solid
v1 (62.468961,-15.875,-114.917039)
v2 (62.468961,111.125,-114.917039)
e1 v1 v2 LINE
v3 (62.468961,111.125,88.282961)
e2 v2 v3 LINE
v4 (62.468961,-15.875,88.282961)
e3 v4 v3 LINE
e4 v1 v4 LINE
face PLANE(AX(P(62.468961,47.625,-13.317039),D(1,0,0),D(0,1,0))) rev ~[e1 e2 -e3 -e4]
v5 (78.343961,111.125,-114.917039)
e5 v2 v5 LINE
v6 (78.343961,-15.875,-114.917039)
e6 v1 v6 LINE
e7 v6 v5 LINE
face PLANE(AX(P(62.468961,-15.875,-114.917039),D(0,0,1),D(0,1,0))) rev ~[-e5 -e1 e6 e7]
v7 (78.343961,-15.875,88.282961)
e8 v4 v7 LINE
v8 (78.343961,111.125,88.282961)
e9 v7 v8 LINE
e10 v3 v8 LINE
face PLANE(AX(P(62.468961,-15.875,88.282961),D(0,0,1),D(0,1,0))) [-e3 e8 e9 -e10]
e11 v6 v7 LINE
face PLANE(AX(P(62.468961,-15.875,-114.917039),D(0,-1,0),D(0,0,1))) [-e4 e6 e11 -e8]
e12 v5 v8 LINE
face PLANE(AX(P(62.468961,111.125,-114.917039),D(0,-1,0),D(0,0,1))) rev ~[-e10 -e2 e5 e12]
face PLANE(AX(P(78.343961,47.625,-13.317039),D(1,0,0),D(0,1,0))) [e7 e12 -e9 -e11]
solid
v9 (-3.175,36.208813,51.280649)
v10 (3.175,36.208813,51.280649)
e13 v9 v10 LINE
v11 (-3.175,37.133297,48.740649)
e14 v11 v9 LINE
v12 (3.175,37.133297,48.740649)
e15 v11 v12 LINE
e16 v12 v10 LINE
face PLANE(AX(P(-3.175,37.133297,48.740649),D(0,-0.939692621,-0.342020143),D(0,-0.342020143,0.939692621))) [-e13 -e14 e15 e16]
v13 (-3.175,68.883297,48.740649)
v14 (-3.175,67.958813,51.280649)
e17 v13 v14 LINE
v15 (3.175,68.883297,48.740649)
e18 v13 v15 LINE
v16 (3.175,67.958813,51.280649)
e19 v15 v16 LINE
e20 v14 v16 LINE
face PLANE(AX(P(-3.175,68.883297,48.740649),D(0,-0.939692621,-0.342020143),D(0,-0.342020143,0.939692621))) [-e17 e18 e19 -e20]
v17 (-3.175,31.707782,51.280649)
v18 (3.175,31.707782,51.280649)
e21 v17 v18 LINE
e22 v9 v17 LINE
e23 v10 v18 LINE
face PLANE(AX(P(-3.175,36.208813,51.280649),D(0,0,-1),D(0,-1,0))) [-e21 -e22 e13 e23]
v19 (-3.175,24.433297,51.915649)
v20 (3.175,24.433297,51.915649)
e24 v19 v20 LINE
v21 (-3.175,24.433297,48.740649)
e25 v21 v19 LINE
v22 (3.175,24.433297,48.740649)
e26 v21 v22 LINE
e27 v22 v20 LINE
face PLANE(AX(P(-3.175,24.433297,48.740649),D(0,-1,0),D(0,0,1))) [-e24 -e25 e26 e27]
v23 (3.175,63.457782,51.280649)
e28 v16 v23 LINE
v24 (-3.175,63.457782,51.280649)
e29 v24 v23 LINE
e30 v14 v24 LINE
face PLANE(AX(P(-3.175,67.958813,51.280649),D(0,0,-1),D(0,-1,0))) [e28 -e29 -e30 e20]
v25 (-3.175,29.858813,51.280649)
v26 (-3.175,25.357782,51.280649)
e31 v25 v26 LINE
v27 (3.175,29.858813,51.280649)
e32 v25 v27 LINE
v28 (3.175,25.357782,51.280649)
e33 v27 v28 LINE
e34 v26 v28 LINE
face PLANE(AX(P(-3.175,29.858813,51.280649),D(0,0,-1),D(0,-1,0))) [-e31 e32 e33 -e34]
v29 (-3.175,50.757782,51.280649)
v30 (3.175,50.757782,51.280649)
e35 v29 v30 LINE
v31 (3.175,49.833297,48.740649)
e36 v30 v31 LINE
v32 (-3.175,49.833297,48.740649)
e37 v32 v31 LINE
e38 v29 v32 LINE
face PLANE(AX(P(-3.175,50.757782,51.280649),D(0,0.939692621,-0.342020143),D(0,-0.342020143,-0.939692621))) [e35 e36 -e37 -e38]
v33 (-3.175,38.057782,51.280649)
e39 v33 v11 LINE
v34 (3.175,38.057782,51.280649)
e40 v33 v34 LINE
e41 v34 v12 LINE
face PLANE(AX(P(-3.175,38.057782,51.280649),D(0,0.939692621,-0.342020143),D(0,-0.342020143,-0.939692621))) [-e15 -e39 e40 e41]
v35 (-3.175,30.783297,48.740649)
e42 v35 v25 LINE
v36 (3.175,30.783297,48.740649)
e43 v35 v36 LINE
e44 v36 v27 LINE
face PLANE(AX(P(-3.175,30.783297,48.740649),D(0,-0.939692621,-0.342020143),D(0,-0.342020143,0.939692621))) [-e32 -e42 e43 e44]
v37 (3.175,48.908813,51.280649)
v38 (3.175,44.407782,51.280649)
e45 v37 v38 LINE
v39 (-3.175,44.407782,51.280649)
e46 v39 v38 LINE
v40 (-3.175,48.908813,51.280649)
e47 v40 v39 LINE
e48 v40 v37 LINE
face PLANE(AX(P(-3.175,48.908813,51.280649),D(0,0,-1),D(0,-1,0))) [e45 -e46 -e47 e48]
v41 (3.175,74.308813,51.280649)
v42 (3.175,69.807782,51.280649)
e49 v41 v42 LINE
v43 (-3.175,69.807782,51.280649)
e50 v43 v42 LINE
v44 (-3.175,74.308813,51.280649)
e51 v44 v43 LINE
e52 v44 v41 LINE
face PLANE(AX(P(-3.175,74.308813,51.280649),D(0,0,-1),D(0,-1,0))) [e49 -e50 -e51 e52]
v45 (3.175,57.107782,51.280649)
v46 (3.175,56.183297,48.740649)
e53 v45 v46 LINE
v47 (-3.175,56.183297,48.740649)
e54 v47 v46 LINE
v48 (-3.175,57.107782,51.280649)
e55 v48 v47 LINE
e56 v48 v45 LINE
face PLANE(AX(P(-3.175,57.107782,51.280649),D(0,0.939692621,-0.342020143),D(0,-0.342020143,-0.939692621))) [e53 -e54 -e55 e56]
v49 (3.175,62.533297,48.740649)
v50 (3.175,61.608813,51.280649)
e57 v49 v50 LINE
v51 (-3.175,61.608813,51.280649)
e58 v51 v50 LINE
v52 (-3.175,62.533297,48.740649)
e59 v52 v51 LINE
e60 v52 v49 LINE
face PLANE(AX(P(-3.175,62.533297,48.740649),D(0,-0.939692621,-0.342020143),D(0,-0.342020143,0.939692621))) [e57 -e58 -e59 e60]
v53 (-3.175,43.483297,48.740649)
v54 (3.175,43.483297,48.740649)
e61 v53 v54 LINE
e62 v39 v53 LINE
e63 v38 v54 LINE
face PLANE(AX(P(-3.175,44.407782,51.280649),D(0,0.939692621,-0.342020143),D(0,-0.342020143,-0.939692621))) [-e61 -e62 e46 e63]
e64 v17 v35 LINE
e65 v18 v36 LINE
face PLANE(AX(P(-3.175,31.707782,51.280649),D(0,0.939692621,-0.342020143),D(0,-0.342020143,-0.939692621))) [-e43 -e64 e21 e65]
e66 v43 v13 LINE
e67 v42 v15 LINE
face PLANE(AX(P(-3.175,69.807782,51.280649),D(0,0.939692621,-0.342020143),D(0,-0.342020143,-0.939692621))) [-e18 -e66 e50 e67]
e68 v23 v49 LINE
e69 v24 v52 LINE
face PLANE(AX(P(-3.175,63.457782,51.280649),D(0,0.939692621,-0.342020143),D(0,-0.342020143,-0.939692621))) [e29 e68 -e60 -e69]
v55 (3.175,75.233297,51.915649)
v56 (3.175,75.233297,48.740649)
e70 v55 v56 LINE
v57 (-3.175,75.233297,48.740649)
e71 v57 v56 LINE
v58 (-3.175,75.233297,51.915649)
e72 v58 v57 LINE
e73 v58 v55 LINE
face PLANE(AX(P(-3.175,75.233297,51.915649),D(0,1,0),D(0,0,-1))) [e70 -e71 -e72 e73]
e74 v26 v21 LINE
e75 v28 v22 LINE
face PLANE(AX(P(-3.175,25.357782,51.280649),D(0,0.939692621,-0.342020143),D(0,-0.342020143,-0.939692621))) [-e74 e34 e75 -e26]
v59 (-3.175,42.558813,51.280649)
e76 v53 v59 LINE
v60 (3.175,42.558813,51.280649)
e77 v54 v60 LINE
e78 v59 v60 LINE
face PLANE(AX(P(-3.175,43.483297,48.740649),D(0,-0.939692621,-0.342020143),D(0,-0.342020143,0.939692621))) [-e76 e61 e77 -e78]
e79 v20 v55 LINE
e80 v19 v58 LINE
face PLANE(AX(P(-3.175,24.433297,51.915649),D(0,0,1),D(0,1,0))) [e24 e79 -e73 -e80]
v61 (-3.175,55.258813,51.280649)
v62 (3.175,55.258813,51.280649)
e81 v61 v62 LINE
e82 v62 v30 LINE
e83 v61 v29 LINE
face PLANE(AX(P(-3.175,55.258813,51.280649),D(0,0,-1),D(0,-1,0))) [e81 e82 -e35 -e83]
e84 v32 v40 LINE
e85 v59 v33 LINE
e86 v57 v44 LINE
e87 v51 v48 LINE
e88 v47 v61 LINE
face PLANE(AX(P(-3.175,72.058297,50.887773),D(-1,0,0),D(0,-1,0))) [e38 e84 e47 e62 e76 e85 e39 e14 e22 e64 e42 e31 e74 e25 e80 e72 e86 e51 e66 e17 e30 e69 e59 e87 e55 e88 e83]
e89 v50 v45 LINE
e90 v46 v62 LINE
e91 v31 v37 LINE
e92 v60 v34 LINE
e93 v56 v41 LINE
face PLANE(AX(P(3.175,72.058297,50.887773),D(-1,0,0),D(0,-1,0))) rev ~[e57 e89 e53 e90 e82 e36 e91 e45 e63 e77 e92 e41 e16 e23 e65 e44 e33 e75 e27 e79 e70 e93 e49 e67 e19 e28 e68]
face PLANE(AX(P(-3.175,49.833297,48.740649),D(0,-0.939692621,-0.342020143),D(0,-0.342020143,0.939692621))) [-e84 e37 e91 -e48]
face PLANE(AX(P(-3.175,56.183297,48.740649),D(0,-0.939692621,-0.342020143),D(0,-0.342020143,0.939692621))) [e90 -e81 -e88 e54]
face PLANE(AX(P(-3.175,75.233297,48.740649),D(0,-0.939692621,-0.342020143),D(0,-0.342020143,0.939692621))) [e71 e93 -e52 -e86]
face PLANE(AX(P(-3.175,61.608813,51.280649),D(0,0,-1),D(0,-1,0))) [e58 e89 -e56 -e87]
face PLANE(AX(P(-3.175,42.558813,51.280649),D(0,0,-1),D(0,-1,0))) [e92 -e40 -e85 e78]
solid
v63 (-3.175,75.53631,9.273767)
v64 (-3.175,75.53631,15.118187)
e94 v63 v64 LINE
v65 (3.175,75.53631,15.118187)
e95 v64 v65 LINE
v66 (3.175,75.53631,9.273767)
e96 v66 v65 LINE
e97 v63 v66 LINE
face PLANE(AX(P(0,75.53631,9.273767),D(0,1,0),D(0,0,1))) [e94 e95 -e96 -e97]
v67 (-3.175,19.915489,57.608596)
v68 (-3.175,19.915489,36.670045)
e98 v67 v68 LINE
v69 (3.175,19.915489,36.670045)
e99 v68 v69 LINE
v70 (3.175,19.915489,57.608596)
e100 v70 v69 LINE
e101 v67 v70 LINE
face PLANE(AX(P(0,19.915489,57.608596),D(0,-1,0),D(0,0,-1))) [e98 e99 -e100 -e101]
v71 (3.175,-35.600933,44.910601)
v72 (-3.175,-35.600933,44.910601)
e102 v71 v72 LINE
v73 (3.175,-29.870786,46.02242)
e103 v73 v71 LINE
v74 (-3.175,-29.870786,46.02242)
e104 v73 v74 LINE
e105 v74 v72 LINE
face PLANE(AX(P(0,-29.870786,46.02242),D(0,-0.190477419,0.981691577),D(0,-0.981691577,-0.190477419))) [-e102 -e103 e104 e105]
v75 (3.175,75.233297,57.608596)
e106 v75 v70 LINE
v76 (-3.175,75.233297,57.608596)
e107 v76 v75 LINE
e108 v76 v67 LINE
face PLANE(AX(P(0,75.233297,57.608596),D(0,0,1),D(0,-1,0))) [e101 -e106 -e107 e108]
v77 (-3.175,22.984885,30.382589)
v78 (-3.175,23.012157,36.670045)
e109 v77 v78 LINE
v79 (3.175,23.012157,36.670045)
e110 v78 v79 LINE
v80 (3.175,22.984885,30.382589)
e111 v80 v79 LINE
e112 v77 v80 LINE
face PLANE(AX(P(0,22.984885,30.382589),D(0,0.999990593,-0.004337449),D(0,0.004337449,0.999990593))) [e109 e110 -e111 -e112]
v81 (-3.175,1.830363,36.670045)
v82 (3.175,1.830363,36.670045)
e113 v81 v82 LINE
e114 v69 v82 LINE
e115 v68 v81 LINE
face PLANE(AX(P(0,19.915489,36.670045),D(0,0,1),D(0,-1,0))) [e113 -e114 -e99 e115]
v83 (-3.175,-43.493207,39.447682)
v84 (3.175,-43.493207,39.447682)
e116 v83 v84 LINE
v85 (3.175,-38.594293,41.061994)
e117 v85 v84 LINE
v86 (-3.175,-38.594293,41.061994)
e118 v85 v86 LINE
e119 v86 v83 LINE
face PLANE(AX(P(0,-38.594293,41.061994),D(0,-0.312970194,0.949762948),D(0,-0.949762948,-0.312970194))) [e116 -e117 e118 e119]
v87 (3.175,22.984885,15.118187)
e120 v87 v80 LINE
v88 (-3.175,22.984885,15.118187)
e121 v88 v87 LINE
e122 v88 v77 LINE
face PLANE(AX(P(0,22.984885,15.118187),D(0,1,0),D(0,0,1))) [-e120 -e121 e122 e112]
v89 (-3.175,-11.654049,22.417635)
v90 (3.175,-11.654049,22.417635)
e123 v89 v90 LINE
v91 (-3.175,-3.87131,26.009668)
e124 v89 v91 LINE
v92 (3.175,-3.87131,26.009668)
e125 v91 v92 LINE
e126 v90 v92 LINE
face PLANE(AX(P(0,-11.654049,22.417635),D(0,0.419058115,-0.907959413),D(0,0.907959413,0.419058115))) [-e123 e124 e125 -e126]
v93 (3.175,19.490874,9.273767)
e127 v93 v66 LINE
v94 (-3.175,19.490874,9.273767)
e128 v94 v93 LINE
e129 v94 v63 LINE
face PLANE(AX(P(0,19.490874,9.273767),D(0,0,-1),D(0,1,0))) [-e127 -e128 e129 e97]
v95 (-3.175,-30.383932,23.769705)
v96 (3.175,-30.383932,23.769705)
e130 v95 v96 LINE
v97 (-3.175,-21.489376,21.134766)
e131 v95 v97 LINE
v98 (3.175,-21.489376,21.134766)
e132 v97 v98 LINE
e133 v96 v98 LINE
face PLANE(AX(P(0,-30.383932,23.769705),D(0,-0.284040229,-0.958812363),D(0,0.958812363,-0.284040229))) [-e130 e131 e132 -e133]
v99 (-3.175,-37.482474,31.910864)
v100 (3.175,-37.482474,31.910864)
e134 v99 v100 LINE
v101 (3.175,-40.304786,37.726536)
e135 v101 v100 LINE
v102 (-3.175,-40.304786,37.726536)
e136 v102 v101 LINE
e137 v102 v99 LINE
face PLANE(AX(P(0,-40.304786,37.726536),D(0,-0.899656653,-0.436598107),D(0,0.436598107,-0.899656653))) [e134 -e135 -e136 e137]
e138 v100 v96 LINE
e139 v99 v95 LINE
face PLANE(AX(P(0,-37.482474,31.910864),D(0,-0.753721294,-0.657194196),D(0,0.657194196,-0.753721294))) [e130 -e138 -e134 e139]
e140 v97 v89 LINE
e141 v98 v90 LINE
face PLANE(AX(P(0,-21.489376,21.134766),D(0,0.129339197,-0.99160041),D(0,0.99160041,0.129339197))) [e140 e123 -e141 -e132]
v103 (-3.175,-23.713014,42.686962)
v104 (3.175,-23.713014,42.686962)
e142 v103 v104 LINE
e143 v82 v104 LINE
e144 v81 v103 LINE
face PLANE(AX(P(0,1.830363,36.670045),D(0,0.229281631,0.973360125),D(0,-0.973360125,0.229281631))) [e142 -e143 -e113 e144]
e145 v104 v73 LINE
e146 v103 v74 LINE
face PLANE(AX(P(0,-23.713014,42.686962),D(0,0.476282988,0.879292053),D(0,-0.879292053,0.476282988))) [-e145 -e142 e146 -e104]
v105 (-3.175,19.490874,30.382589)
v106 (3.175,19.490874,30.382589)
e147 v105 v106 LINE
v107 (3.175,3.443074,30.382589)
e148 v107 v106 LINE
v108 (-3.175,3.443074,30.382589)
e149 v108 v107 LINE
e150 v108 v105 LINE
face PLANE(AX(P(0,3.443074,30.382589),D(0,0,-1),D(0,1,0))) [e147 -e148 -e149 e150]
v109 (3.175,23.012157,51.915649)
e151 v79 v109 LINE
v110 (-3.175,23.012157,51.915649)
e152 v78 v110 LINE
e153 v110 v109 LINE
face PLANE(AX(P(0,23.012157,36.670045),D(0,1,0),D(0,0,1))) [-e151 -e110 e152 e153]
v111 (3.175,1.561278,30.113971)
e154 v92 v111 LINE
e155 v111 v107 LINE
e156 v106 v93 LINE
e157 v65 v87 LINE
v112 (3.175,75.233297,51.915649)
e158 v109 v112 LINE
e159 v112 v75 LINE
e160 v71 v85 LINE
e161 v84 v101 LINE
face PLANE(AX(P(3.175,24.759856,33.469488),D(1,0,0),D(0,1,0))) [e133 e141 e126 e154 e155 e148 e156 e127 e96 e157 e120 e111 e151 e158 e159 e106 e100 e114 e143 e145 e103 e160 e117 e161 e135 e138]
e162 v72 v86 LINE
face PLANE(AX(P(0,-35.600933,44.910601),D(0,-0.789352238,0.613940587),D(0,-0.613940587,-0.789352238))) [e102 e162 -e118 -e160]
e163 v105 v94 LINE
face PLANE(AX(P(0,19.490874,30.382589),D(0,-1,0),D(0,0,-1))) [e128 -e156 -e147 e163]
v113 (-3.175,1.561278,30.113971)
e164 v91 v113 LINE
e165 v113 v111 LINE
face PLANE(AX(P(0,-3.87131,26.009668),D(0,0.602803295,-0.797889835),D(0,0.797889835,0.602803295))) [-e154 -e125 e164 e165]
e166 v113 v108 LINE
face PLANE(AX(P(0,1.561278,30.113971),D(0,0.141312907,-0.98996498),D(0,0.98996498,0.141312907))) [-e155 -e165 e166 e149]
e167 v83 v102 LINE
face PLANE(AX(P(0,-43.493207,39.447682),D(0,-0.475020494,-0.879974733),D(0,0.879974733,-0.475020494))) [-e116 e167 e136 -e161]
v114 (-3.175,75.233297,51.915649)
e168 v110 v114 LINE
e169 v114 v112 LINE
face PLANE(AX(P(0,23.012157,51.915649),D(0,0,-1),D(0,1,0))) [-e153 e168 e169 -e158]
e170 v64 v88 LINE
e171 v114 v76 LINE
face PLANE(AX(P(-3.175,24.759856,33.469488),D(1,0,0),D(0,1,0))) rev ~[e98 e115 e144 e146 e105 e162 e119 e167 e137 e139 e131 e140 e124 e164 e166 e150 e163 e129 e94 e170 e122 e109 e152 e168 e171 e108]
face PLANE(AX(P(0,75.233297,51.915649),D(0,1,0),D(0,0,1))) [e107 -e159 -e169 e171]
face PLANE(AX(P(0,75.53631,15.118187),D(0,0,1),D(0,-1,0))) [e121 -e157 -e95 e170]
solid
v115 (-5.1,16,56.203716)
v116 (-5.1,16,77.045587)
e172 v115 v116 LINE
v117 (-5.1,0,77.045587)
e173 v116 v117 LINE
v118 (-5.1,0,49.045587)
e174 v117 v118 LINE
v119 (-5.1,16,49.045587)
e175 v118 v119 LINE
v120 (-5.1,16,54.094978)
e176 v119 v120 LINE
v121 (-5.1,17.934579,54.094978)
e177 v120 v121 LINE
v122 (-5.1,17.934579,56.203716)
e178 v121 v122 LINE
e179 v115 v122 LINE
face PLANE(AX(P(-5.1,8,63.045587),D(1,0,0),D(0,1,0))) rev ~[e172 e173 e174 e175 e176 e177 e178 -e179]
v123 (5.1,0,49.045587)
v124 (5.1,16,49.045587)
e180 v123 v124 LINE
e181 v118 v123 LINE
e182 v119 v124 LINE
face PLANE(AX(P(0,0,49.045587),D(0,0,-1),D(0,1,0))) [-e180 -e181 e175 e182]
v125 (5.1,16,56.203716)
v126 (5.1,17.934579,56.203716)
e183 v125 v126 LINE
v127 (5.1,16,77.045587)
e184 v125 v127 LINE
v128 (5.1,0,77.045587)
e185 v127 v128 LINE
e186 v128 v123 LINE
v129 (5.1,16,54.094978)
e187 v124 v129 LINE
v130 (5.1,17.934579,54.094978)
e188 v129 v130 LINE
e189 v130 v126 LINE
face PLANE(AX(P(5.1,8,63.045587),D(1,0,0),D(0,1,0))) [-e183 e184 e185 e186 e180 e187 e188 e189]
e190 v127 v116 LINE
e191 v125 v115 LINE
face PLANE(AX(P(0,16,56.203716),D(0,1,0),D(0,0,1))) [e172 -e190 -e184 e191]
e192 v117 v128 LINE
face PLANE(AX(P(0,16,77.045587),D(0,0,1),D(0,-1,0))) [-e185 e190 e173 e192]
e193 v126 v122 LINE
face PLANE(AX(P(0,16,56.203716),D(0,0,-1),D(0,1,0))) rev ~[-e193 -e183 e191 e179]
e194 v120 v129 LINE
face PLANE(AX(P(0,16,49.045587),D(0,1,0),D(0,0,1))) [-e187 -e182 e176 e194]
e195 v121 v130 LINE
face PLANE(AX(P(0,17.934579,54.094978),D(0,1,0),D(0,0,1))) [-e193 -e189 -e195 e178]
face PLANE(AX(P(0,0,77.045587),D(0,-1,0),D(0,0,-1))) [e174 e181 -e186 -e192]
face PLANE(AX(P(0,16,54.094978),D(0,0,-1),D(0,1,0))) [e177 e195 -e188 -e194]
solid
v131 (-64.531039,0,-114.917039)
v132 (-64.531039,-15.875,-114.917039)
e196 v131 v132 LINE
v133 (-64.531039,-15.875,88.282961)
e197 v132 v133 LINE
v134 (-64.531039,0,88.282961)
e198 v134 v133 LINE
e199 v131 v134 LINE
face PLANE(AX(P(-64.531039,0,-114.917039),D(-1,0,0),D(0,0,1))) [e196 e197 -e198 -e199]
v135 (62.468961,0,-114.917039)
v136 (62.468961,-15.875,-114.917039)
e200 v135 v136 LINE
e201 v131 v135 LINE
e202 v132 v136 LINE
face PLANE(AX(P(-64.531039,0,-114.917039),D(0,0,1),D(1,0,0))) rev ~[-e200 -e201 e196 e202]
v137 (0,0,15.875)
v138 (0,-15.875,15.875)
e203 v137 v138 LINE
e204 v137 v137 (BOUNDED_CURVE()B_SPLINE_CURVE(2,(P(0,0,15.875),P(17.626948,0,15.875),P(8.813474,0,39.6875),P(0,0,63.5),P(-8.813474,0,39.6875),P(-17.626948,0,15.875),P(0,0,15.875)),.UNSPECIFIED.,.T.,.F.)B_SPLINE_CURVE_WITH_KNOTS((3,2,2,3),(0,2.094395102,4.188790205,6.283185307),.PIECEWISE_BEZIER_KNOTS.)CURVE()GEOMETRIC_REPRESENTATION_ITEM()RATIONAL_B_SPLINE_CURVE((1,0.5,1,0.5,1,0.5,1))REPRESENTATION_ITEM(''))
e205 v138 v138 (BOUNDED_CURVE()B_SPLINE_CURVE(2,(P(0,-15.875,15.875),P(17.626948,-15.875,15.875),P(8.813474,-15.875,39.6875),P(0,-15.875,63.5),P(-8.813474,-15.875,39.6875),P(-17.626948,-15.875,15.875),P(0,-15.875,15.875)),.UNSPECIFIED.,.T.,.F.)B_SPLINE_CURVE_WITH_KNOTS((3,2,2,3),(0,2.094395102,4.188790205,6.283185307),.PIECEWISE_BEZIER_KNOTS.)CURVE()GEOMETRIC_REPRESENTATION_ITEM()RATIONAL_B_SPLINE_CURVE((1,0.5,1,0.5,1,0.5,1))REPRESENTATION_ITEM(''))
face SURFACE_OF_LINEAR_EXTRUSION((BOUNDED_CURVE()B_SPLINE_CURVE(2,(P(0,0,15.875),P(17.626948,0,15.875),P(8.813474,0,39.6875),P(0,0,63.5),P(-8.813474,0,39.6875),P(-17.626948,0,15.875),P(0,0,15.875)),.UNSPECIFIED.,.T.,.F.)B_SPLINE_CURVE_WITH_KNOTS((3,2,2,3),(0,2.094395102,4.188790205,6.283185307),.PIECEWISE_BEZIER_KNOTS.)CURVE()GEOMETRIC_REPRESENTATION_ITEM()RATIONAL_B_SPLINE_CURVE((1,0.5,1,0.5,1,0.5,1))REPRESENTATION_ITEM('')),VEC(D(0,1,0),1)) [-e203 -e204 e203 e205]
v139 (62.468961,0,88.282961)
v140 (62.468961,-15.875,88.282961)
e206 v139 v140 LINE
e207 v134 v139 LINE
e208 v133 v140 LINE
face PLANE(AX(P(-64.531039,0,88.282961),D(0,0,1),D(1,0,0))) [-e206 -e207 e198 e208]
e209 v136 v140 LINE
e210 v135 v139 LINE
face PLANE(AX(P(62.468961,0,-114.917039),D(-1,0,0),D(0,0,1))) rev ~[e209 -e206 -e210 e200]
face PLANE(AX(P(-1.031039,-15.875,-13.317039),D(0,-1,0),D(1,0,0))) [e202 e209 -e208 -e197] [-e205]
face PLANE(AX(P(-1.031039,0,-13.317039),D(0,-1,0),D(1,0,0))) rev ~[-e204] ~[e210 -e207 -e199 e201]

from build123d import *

# Parameters (mm, degrees)
F2_DEPTH      = 3.175
F2_DEPTH_BACK = 3.175
F3_W          = 127
F3_H          = 203.2
F4_DEPTH      = 15.875
F5_W          = 127
F5_H          = 203.2
F6_DEPTH      = 15.875
F7_W          = 1.9345794022
F7_H          = 2.1087378263
F8_DEPTH      = 5.1
F8_DEPTH_BACK = 5.1
F10_DEPTH     = 6.35


# Not quite as in the source:
# - a variable given as a bare number and used for a length is read in inches; the dataset says mm whatever the document's units were


with BuildPart() as f2:
    # F1 (on Right) → F2 (new body, two sides)
    with BuildSketch(Plane.YZ) as f2_sk:
        Polygon((-38.594293431, 41.0619944761), (-43.4932071195, 39.4476822198), (-40.3047855642, 37.7265355505), (-37.482474095, 31.9108637659), (-30.3839322929, 23.7697052669), (-21.4893757698, 21.1347664927), (-11.6540487569, 22.4176353632), (-3.8713104227, 26.0096677876), (1.5612775253, 30.1139711279), (3.4430737253, 30.3825888026), (19.4908740901, 30.3825888026), (19.4908740901, 9.2737668518), (75.5363102326, 9.2737668518), (75.5363102326, 15.1181869977), (22.9848847986, 15.1181869977), (22.9848847986, 30.3825888026), (23.0121565767, 36.6700449444), (23.0121565767, 51.9156488357), (75.233297396, 51.9156488357), (75.233297396, 57.6085964854), (19.9154892202, 57.6085964854), (19.9154892202, 36.6700449444), (1.8303633194, 36.6700449444), (-23.7130144418, 42.6869621861), (-29.8707857541, 46.0224201941), (-35.6009331156, 44.9106008581), align=None)
    extrude(amount=F2_DEPTH)
    extrude(f2_sk.sketch, amount=-F2_DEPTH_BACK)


with BuildPart() as f4:
    # F3 (on Front) → F4 (new body)
    with BuildSketch(Plane.XZ):
        with Locations((-1.0310392827, -13.3170386252)):
            Rectangle(F3_W, F3_H)
        with BuildLine():
            add(Edge.make_bspline(
                [(0, 15.875), (17.626948032, 15.875), (8.813474016, 39.6875), (0, 63.5), (-8.813474016, 39.6875), (-17.626948032, 15.875), (0, 15.875)],
                knots=[0, 0, 0, 2.0943951024, 2.0943951024, 4.1887902048, 4.1887902048, 6.2831853072, 6.2831853072, 6.2831853072], degree=2, weights=[1, 0.5, 1, 0.5, 1, 0.5, 1]))
        make_face(mode=Mode.SUBTRACT)
    extrude(amount=F4_DEPTH)


with BuildPart() as f6:
    # F5 (on face) → F6 (new body)
    with BuildSketch(Plane.YZ.offset(62.4689607173)):
        with Locations((47.625, -13.3170386252)):
            Rectangle(F5_W, F5_H)
    extrude(amount=F6_DEPTH)


with BuildPart() as f8:
    # F7 (on Right) → F8 (new body, two sides)
    with BuildSketch(Plane.YZ) as f8_sk:
        Polygon((16, 56.2037155032), (16, 77.0455870458), (0, 77.0455870458), (0, 49.0455870458), (16, 49.0455870458), (16, 54.0949776769), align=None)
        with Locations((16.9672897011, 55.14934659)):
            Rectangle(F7_W, F7_H)
    extrude(amount=F8_DEPTH)
    extrude(f8_sk.sketch, amount=-F8_DEPTH_BACK)


with BuildPart() as f10:
    # F9 (on face) → F10 (new body)
    with BuildSketch(Plane(origin=(-3.175, 0, 0), x_dir=(0, -1, 0), z_dir=(-1, 0, 0))):
        Polygon((-68.883297396, 51.9156488357), (-75.233297396, 51.9156488357), (-75.233297396, 51.2806488357), (-75.233297396, 48.7406488357), (-74.308813001, 51.2806488357), (-69.807781791, 51.2806488357), (-68.883297396, 48.7406488357), (-68.883297396, 51.2806488357), align=None)
        Polygon((-62.533297396, 51.9156488357), (-68.883297396, 51.9156488357), (-68.883297396, 51.2806488357), (-68.883297396, 48.7406488357), (-67.958813001, 51.2806488357), (-63.457781791, 51.2806488357), (-62.533297396, 48.7406488357), (-62.533297396, 51.2806488357), align=None)
        Polygon((-56.183297396, 51.9156488357), (-62.533297396, 51.9156488357), (-62.533297396, 51.2806488357), (-62.533297396, 48.7406488357), (-61.608813001, 51.2806488357), (-57.107781791, 51.2806488357), (-56.183297396, 48.7406488357), (-56.183297396, 51.2806488357), align=None)
        Polygon((-49.833297396, 51.9156488357), (-56.183297396, 51.9156488357), (-56.183297396, 51.2806488357), (-56.183297396, 48.7406488357), (-55.258813001, 51.2806488357), (-50.757781791, 51.2806488357), (-49.833297396, 48.7406488357), (-49.833297396, 51.2806488357), align=None)
        Polygon((-43.483297396, 51.9156488357), (-49.833297396, 51.9156488357), (-49.833297396, 51.2806488357), (-49.833297396, 48.7406488357), (-48.908813001, 51.2806488357), (-44.407781791, 51.2806488357), (-43.483297396, 48.7406488357), (-43.483297396, 51.2806488357), align=None)
        Polygon((-37.133297396, 51.9156488357), (-43.483297396, 51.9156488357), (-43.483297396, 51.2806488357), (-43.483297396, 48.7406488357), (-42.558813001, 51.2806488357), (-38.057781791, 51.2806488357), (-37.133297396, 48.7406488357), (-37.133297396, 51.2806488357), align=None)
        Polygon((-30.783297396, 51.9156488357), (-37.133297396, 51.9156488357), (-37.133297396, 51.2806488357), (-37.133297396, 48.7406488357), (-36.208813001, 51.2806488357), (-31.707781791, 51.2806488357), (-30.783297396, 48.7406488357), (-30.783297396, 51.2806488357), align=None)
        Polygon((-24.433297396, 51.9156488357), (-30.783297396, 51.9156488357), (-30.783297396, 51.2806488357), (-30.783297396, 48.7406488357), (-29.858813001, 51.2806488357), (-25.357781791, 51.2806488357), (-24.433297396, 48.7406488357), (-24.433297396, 51.2806488357), align=None)
    extrude(amount=-F10_DEPTH)


solid = Compound([f2.part, f4.part, f6.part, f8.part, f10.part])
